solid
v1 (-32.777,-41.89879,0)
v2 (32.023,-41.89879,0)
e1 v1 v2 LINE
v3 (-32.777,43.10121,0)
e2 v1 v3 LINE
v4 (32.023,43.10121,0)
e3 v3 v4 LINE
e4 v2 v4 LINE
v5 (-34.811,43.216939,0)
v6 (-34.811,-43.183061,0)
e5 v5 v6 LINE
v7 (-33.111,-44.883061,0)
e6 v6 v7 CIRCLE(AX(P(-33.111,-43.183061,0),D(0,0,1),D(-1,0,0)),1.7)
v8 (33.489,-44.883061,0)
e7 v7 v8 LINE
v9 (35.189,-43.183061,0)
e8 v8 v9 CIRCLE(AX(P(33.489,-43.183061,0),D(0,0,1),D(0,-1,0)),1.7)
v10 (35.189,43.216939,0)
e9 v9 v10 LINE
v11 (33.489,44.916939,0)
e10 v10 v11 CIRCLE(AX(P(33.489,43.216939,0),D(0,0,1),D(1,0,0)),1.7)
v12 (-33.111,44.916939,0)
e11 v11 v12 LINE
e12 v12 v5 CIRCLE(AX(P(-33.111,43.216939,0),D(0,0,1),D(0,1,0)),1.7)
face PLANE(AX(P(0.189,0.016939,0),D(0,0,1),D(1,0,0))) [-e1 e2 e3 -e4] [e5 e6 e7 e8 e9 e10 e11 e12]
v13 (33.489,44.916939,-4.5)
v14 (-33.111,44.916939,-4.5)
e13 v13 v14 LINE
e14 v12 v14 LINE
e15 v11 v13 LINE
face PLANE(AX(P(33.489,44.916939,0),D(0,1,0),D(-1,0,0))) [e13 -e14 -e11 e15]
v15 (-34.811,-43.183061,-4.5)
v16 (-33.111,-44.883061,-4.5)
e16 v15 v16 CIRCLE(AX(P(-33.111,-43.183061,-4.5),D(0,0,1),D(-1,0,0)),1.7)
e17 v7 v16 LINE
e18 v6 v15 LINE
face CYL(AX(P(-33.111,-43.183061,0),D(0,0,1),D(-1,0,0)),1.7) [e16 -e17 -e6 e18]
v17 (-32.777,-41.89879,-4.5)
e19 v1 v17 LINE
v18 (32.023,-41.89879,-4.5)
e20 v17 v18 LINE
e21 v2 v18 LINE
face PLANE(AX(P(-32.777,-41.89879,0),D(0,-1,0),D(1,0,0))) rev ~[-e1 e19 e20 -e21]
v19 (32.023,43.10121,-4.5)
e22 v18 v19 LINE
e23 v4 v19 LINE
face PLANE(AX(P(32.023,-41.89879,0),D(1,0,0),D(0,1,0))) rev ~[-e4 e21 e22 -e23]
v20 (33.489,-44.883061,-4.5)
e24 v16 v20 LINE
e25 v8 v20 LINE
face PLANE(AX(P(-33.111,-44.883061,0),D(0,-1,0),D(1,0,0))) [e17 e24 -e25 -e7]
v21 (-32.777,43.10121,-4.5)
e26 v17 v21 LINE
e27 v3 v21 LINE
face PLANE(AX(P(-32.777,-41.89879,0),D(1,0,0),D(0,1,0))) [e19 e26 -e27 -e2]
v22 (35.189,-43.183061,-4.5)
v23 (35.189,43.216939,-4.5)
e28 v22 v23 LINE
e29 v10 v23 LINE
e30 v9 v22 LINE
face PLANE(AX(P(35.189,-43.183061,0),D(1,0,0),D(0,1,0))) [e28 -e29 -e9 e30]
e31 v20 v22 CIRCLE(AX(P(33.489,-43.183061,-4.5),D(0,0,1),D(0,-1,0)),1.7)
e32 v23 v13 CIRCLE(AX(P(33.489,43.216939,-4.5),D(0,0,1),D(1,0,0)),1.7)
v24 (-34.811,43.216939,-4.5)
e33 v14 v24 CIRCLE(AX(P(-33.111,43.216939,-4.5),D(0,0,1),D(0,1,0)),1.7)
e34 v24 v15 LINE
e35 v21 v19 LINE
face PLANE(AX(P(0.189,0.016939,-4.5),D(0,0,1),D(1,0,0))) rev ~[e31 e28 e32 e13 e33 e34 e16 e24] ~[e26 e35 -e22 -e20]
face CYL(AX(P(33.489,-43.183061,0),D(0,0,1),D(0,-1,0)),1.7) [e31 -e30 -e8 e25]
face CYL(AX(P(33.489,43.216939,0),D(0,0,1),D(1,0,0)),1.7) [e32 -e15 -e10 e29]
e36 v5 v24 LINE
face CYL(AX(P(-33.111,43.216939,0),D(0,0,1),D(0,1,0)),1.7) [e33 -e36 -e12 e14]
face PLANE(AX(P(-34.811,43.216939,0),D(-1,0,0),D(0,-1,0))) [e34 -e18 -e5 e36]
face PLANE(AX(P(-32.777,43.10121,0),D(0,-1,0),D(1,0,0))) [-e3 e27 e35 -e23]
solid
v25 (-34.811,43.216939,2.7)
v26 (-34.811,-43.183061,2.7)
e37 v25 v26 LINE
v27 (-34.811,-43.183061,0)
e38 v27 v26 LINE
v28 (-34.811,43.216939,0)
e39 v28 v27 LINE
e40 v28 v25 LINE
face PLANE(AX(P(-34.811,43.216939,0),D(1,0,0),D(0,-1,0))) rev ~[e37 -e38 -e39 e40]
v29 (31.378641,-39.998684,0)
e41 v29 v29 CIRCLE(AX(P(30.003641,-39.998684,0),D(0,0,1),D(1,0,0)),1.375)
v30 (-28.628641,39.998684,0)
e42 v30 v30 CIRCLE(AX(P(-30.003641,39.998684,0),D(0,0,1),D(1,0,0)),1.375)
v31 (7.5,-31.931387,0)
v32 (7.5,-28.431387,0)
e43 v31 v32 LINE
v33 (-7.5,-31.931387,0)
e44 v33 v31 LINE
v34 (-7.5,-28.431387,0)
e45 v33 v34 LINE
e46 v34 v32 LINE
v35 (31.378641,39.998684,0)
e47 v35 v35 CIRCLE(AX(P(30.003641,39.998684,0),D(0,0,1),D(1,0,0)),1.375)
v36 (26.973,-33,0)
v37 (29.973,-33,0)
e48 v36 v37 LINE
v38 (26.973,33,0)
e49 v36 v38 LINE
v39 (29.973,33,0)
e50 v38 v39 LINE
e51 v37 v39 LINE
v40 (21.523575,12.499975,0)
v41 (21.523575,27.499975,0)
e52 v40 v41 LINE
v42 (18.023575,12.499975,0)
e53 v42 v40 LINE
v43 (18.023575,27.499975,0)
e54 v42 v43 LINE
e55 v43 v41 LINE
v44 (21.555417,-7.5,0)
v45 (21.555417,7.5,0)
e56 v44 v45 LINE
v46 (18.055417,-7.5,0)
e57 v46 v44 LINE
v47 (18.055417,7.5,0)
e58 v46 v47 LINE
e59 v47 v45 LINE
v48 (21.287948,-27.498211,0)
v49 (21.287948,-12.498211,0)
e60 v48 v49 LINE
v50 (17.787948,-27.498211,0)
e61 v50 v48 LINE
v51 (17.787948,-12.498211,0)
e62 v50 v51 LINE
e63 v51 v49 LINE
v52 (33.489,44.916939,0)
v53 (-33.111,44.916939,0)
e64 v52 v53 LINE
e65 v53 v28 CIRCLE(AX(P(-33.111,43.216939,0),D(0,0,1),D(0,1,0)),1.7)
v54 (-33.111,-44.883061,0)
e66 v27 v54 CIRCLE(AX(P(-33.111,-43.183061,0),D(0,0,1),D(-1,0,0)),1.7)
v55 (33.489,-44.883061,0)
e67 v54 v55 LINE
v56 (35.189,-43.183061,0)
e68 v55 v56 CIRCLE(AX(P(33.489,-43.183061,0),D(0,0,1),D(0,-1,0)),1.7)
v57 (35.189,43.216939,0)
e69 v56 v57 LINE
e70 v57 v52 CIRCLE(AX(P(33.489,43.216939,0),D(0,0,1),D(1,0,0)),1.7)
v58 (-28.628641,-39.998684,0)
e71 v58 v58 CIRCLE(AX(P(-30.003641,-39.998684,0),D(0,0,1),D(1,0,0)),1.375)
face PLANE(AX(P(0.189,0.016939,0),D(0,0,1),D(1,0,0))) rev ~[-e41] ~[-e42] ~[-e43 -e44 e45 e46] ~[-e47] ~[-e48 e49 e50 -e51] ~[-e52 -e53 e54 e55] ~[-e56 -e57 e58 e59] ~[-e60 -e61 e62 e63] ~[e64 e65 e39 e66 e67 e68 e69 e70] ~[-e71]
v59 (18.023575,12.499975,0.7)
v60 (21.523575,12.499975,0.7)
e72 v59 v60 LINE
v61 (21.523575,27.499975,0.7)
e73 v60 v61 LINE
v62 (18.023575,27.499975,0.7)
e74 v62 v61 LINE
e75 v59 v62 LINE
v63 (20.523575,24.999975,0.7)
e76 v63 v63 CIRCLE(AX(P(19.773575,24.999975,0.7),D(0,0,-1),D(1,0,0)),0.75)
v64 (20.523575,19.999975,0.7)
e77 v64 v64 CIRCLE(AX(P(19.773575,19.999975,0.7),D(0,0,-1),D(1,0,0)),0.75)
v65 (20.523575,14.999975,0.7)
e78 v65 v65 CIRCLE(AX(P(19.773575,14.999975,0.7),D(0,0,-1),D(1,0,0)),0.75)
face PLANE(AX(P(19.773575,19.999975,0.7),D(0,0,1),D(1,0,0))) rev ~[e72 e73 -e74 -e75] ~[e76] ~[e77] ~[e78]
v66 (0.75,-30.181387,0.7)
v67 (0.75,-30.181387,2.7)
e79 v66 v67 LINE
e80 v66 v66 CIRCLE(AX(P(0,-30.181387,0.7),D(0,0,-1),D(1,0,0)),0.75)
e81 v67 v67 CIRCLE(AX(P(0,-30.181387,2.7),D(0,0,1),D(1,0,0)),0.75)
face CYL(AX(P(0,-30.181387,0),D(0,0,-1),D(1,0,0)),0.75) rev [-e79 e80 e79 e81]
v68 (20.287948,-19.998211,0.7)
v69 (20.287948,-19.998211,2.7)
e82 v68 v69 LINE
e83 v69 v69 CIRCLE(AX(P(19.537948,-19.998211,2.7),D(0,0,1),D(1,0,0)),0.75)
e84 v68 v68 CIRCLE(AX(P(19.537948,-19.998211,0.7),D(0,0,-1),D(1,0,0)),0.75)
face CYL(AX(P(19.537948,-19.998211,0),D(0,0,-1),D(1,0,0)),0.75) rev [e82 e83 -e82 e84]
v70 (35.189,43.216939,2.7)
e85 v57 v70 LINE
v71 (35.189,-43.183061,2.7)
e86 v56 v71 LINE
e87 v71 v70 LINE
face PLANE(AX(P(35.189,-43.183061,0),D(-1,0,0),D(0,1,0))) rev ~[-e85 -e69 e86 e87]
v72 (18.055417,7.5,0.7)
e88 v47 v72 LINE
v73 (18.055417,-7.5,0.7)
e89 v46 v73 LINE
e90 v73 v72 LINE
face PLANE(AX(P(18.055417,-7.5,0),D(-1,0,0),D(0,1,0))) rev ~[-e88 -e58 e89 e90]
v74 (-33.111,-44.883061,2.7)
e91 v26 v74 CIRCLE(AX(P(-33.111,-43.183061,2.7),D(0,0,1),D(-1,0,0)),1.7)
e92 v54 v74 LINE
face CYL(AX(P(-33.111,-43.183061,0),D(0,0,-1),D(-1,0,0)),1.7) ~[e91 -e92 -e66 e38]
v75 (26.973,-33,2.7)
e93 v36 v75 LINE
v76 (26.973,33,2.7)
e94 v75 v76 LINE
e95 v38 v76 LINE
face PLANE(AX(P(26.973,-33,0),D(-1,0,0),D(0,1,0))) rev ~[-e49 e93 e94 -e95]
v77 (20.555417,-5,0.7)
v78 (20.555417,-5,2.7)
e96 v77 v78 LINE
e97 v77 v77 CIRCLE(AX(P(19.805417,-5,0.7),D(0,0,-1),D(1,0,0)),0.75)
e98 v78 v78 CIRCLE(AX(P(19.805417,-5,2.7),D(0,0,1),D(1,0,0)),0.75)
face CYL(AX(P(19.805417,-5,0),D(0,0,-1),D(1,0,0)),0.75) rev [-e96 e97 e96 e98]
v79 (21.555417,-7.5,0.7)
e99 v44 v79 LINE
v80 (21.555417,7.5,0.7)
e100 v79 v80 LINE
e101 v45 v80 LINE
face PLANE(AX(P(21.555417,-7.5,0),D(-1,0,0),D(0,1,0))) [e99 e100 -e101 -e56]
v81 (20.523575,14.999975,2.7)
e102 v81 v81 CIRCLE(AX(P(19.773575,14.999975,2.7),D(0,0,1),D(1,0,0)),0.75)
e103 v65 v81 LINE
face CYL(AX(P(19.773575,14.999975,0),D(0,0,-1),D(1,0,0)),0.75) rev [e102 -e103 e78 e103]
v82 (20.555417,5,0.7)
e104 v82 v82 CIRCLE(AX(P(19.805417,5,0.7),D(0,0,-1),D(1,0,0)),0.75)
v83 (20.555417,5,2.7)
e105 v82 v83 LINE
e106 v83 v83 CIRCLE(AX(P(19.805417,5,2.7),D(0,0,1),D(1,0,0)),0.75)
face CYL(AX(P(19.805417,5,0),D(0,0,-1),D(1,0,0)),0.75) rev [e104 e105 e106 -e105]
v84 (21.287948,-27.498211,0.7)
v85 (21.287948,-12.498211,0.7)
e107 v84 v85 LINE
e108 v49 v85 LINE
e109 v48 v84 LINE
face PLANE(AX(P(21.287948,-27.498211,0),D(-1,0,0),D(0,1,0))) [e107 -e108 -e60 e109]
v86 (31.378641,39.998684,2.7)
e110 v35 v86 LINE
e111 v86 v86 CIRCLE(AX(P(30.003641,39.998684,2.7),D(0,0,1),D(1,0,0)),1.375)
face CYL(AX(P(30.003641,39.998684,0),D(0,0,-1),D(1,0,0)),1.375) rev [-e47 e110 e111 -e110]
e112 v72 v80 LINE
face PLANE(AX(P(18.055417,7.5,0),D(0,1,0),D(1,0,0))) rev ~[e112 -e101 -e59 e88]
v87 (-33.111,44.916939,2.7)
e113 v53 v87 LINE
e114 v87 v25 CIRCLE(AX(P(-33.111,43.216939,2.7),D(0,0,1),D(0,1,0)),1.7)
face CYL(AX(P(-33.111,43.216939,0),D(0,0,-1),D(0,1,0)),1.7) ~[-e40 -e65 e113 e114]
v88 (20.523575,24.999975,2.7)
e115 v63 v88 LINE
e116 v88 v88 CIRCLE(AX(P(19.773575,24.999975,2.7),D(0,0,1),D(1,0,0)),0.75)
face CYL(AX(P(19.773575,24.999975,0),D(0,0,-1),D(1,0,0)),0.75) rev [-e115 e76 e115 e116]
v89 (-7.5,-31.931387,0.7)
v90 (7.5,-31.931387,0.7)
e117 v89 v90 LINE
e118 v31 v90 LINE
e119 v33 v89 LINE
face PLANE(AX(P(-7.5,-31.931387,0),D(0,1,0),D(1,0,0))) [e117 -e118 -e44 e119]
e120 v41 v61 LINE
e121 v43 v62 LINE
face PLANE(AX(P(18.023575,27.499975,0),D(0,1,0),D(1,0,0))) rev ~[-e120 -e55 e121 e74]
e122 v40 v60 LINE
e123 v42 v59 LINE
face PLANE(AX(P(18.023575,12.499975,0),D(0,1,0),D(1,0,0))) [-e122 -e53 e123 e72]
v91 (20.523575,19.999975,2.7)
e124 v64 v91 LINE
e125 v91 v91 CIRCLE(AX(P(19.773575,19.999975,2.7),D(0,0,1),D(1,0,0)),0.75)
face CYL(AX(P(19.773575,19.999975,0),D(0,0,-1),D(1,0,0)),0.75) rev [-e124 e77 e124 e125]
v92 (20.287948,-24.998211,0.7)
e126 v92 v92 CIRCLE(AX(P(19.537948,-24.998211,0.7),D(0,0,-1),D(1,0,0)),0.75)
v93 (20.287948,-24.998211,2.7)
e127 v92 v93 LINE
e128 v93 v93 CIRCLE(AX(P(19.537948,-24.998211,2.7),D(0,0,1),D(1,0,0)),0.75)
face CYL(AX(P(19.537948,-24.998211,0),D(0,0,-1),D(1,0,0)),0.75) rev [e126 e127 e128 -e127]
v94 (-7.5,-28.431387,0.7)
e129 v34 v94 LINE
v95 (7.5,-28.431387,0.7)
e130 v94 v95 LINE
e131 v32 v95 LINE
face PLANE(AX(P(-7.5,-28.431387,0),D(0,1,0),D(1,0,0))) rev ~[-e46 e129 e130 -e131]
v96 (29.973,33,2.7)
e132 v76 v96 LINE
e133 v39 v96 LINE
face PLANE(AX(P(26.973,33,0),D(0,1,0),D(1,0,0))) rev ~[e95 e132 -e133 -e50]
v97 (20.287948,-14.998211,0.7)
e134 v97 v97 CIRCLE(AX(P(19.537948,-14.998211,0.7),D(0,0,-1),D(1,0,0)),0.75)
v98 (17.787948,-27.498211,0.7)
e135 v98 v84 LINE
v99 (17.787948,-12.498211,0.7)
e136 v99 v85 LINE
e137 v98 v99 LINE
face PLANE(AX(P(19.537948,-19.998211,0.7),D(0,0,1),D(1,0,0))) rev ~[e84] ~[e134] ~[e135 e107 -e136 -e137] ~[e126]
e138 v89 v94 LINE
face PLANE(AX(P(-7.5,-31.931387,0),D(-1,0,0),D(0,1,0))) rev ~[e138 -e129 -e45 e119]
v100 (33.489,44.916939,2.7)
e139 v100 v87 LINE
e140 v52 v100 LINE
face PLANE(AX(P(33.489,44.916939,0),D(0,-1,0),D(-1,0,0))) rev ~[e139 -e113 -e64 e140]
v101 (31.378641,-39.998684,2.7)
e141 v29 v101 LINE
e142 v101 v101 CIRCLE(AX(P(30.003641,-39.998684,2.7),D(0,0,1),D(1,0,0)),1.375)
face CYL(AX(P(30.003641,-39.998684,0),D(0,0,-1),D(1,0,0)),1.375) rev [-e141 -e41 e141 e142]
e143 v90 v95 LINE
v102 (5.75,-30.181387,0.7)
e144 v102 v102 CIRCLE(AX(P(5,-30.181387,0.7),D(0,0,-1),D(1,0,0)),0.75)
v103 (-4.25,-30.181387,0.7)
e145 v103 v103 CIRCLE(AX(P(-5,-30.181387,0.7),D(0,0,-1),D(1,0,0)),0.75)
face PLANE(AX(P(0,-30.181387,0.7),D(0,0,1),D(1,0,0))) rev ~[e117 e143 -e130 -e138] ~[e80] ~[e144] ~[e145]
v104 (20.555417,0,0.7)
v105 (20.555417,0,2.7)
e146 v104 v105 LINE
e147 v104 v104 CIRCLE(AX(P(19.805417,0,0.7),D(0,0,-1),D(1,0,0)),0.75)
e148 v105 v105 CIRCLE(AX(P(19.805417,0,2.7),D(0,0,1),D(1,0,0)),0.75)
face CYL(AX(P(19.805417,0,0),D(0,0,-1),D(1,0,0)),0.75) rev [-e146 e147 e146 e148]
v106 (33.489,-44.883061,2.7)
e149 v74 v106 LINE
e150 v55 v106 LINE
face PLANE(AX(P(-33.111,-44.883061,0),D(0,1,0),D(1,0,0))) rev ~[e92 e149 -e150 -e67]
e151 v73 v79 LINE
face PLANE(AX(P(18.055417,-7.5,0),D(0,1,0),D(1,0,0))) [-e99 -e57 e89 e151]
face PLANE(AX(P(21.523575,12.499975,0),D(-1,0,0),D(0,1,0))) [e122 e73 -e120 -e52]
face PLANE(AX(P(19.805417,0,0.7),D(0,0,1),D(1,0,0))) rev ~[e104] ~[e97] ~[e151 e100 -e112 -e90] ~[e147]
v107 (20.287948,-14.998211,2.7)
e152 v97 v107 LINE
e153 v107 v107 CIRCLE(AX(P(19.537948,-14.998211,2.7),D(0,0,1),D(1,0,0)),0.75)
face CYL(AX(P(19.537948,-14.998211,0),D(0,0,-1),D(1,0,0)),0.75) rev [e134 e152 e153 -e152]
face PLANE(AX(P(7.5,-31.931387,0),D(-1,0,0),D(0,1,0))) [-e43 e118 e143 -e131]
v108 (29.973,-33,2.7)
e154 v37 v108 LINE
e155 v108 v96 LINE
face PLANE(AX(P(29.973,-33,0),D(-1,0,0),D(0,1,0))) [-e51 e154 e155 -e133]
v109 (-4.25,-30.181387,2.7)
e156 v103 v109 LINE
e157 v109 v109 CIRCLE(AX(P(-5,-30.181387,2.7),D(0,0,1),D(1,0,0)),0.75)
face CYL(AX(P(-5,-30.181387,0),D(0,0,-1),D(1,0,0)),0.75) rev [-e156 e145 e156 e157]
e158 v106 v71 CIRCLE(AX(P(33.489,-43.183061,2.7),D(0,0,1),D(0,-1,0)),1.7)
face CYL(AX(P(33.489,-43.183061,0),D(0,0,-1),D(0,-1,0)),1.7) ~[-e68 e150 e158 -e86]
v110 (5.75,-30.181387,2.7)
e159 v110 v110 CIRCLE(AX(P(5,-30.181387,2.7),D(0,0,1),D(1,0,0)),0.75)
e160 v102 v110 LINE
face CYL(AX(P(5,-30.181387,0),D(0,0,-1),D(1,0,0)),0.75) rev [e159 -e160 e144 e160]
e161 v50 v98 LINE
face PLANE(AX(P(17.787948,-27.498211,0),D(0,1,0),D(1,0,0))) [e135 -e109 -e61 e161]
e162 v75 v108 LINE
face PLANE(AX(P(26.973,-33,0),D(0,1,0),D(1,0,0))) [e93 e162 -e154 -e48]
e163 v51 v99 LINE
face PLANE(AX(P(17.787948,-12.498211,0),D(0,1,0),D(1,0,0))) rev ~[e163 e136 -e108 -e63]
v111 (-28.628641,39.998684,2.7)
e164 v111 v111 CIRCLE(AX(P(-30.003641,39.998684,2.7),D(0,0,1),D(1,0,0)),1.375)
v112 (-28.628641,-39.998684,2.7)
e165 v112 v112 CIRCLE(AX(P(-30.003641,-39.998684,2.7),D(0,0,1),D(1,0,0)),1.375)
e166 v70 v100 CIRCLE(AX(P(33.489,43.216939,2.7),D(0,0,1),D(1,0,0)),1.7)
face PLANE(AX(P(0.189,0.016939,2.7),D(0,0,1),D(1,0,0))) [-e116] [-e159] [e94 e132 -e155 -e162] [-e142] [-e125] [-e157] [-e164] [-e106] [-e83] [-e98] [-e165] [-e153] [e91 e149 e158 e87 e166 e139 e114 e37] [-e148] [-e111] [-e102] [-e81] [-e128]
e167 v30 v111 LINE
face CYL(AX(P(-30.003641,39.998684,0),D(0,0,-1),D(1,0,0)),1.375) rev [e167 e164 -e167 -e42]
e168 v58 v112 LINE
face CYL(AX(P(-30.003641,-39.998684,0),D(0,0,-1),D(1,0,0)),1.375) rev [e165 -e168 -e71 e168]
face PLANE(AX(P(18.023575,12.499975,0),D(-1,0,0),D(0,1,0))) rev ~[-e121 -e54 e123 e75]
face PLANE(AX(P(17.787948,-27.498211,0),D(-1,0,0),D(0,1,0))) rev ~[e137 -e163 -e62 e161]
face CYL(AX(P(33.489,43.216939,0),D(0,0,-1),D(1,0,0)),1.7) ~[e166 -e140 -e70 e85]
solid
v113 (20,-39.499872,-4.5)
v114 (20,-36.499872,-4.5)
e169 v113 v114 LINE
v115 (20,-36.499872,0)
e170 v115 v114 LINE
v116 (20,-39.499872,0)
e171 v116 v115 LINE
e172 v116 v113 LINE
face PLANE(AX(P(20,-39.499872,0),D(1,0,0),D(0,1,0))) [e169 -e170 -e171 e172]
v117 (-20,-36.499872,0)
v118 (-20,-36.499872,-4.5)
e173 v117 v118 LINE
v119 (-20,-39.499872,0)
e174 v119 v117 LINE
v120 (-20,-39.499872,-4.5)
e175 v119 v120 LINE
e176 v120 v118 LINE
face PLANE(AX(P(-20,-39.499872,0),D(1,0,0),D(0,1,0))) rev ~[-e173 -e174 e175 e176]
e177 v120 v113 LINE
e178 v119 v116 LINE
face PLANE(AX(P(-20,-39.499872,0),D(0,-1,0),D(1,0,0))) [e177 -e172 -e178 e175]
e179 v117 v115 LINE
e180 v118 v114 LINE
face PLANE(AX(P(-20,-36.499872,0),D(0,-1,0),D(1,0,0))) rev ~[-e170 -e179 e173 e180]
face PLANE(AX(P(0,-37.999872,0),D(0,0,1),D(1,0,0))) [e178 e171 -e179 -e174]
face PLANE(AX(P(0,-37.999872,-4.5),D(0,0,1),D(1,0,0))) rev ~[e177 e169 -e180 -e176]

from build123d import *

# Parameters (mm, degrees)
F0_W     = 64.8
F0_H     = 85
F0_R     = 1.375
F0_W_2   = 40
F0_H_2   = 3
F0_W_3   = 15
F0_H_3   = 3.5
F0_W_4   = 3.5
F0_H_4   = 15
F0_W_5   = 3
F0_H_5   = 66
F0_R_2   = 0.75
F1_DEPTH = 2.7
F2_DEPTH = 4.5
F3_DEPTH = 0.7


# Not quite as in the source:
# - a feature names something its author has since deleted; it is built from what else it names


with BuildPart() as f1:
    # F0 (on Top) → F1 (new body)
    with BuildSketch(Plane.XY):
        with BuildLine():
            Line((33.489, 44.9169387996), (-33.111, 44.9169387996))
            ThreePointArc((-33.111, 44.9169387996), (-34.313081528, 44.4190203276), (-34.811, 43.2169387996))
            Line((-34.811, 43.2169387996), (-34.811, -43.1830612004))
            ThreePointArc((-34.811, -43.1830612004), (-34.313081528, -44.3851427284), (-33.111, -44.8830612004))
            Line((-33.111, -44.8830612004), (33.489, -44.8830612004))
            ThreePointArc((33.489, -44.8830612004), (34.691081528, -44.3851427284), (35.189, -43.1830612004))
            Line((35.189, -43.1830612004), (35.189, 43.2169387996))
            ThreePointArc((35.189, 43.2169387996), (34.691081528, 44.4190203276), (33.489, 44.9169387996))
        make_face()
        with Locations((-0.377, 0.6012101471)):
            Rectangle(F0_W, F0_H, mode=Mode.SUBTRACT)
        with Locations((-0.377, 0.6012101471)):
            Rectangle(F0_W, F0_H)
        with Locations((-30.0036408007, -39.9986840785)):
            Circle(F0_R, mode=Mode.SUBTRACT)
        with Locations((0, -37.9998721182)):
            Rectangle(F0_W_2, F0_H_2, mode=Mode.SUBTRACT)
        with Locations((0, -30.1813874394)):
            Rectangle(F0_W_3, F0_H_3, mode=Mode.SUBTRACT)
        with Locations((30.0036408007, -39.9986840785)):
            Circle(F0_R, mode=Mode.SUBTRACT)
        with Locations((19.5379477396, -19.9982114275)):
            Rectangle(F0_W_4, F0_H_4, mode=Mode.SUBTRACT)
        with Locations((19.8054168016, 0)):
            Rectangle(F0_W_4, F0_H_4, mode=Mode.SUBTRACT)
        with Locations((28.473, 0)):
            Rectangle(F0_W_5, F0_H_5, mode=Mode.SUBTRACT)
        with Locations((-30.0036408007, 39.9986840785)):
            Circle(F0_R, mode=Mode.SUBTRACT)
        with Locations((19.773574583, 19.9999746518)):
            Rectangle(F0_W_4, F0_H_4, mode=Mode.SUBTRACT)
        with Locations((30.0036408007, 39.9986840785)):
            Circle(F0_R, mode=Mode.SUBTRACT)
        with Locations((0, -37.9998721182)):
            Rectangle(F0_W_2, F0_H_2)
        with Locations((19.8054168016, 0)):
            Rectangle(F0_W_4, F0_H_4)
        with Locations((19.8054168016, -5)):
            Circle(F0_R_2, mode=Mode.SUBTRACT)
        with Locations((19.8054168016, 0)):
            Circle(F0_R_2, mode=Mode.SUBTRACT)
        with Locations((19.8054168016, 5)):
            Circle(F0_R_2, mode=Mode.SUBTRACT)
        with Locations((19.773574583, 19.9999746518)):
            Rectangle(F0_W_4, F0_H_4)
        with Locations((19.773574583, 14.9999746518)):
            Circle(F0_R_2, mode=Mode.SUBTRACT)
        with Locations((19.773574583, 19.9999746518)):
            Circle(F0_R_2, mode=Mode.SUBTRACT)
        with Locations((19.773574583, 24.9999746518)):
            Circle(F0_R_2, mode=Mode.SUBTRACT)
        with Locations((19.5379477396, -19.9982114275)):
            Rectangle(F0_W_4, F0_H_4)
        with Locations((19.5379477396, -24.9982114275)):
            Circle(F0_R_2, mode=Mode.SUBTRACT)
        with Locations((19.5379477396, -19.9982114275)):
            Circle(F0_R_2, mode=Mode.SUBTRACT)
        with Locations((19.5379477396, -14.9982114275)):
            Circle(F0_R_2, mode=Mode.SUBTRACT)
        with Locations((0, -30.1813874394)):
            Rectangle(F0_W_3, F0_H_3)
        with Locations((-5, -30.1813874394)):
            Circle(F0_R_2, mode=Mode.SUBTRACT)
        with Locations((0, -30.1813874394)):
            Circle(F0_R_2, mode=Mode.SUBTRACT)
        with Locations((5, -30.1813874394)):
            Circle(F0_R_2, mode=Mode.SUBTRACT)
    extrude(amount=F1_DEPTH)

    # F0 (on Top) → F3 (cut)
    with BuildSketch(Plane.XY):
        with Locations((0, -30.1813874394)):
            Rectangle(F0_W_3, F0_H_3)
        with Locations((-5, -30.1813874394)):
            Circle(F0_R_2, mode=Mode.SUBTRACT)
        with Locations((0, -30.1813874394)):
            Circle(F0_R_2, mode=Mode.SUBTRACT)
        with Locations((5, -30.1813874394)):
            Circle(F0_R_2, mode=Mode.SUBTRACT)
        with Locations((19.5379477396, -19.9982114275)):
            Rectangle(F0_W_4, F0_H_4)
        with Locations((19.5379477396, -24.9982114275)):
            Circle(F0_R_2, mode=Mode.SUBTRACT)
        with Locations((19.5379477396, -19.9982114275)):
            Circle(F0_R_2, mode=Mode.SUBTRACT)
        with Locations((19.5379477396, -14.9982114275)):
            Circle(F0_R_2, mode=Mode.SUBTRACT)
        with Locations((19.8054168016, 0)):
            Rectangle(F0_W_4, F0_H_4)
        with Locations((19.8054168016, -5)):
            Circle(F0_R_2, mode=Mode.SUBTRACT)
        with Locations((19.8054168016, 0)):
            Circle(F0_R_2, mode=Mode.SUBTRACT)
        with Locations((19.8054168016, 5)):
            Circle(F0_R_2, mode=Mode.SUBTRACT)
        with Locations((19.773574583, 19.9999746518)):
            Rectangle(F0_W_4, F0_H_4)
        with Locations((19.773574583, 14.9999746518)):
            Circle(F0_R_2, mode=Mode.SUBTRACT)
        with Locations((19.773574583, 19.9999746518)):
            Circle(F0_R_2, mode=Mode.SUBTRACT)
        with Locations((19.773574583, 24.9999746518)):
            Circle(F0_R_2, mode=Mode.SUBTRACT)
        with Locations((5, -30.1813874394)):
            Circle(F0_R_2)
        with Locations((19.8054168016, 5)):
            Circle(F0_R_2)
        with Locations((19.8054168016, -5)):
            Circle(F0_R_2)
        with Locations((19.773574583, 14.9999746518)):
            Circle(F0_R_2)
        with Locations((19.773574583, 24.9999746518)):
            Circle(F0_R_2)
        with Locations((19.5379477396, -24.9982114275)):
            Circle(F0_R_2)
        with Locations((19.5379477396, -14.9982114275)):
            Circle(F0_R_2)
        with Locations((19.773574583, 19.9999746518)):
            Circle(F0_R_2)
        with Locations((-5, -30.1813874394)):
            Circle(F0_R_2)
        with Locations((0, -30.1813874394)):
            Circle(F0_R_2)
        with Locations((19.5379477396, -19.9982114275)):
            Circle(F0_R_2)
        with Locations((19.8054168016, 0)):
            Circle(F0_R_2)
    extrude(amount=F3_DEPTH, mode=Mode.SUBTRACT)


with BuildPart() as f2:
    # F0 (on Top) → F2 (new body)
    with BuildSketch(Plane.XY):
        with BuildLine():
            Line((33.489, 44.9169387996), (-33.111, 44.9169387996))
            ThreePointArc((-33.111, 44.9169387996), (-34.313081528, 44.4190203276), (-34.811, 43.2169387996))
            Line((-34.811, 43.2169387996), (-34.811, -43.1830612004))
            ThreePointArc((-34.811, -43.1830612004), (-34.313081528, -44.3851427284), (-33.111, -44.8830612004))
            Line((-33.111, -44.8830612004), (33.489, -44.8830612004))
            ThreePointArc((33.489, -44.8830612004), (34.691081528, -44.3851427284), (35.189, -43.1830612004))
            Line((35.189, -43.1830612004), (35.189, 43.2169387996))
            ThreePointArc((35.189, 43.2169387996), (34.691081528, 44.4190203276), (33.489, 44.9169387996))
        make_face()
        with Locations((-0.377, 0.6012101471)):
            Rectangle(F0_W, F0_H, mode=Mode.SUBTRACT)
    extrude(amount=-F2_DEPTH)


with BuildPart() as f2b:
    # F0 (on Top) → F2, piece 2 (new body)
    with BuildSketch(Plane.XY):
        with Locations((0, -37.9998721182)):
            Rectangle(F0_W_2, F0_H_2)
    extrude(amount=-F2_DEPTH)


solid = Compound([f1.part, f2.part, f2b.part])
